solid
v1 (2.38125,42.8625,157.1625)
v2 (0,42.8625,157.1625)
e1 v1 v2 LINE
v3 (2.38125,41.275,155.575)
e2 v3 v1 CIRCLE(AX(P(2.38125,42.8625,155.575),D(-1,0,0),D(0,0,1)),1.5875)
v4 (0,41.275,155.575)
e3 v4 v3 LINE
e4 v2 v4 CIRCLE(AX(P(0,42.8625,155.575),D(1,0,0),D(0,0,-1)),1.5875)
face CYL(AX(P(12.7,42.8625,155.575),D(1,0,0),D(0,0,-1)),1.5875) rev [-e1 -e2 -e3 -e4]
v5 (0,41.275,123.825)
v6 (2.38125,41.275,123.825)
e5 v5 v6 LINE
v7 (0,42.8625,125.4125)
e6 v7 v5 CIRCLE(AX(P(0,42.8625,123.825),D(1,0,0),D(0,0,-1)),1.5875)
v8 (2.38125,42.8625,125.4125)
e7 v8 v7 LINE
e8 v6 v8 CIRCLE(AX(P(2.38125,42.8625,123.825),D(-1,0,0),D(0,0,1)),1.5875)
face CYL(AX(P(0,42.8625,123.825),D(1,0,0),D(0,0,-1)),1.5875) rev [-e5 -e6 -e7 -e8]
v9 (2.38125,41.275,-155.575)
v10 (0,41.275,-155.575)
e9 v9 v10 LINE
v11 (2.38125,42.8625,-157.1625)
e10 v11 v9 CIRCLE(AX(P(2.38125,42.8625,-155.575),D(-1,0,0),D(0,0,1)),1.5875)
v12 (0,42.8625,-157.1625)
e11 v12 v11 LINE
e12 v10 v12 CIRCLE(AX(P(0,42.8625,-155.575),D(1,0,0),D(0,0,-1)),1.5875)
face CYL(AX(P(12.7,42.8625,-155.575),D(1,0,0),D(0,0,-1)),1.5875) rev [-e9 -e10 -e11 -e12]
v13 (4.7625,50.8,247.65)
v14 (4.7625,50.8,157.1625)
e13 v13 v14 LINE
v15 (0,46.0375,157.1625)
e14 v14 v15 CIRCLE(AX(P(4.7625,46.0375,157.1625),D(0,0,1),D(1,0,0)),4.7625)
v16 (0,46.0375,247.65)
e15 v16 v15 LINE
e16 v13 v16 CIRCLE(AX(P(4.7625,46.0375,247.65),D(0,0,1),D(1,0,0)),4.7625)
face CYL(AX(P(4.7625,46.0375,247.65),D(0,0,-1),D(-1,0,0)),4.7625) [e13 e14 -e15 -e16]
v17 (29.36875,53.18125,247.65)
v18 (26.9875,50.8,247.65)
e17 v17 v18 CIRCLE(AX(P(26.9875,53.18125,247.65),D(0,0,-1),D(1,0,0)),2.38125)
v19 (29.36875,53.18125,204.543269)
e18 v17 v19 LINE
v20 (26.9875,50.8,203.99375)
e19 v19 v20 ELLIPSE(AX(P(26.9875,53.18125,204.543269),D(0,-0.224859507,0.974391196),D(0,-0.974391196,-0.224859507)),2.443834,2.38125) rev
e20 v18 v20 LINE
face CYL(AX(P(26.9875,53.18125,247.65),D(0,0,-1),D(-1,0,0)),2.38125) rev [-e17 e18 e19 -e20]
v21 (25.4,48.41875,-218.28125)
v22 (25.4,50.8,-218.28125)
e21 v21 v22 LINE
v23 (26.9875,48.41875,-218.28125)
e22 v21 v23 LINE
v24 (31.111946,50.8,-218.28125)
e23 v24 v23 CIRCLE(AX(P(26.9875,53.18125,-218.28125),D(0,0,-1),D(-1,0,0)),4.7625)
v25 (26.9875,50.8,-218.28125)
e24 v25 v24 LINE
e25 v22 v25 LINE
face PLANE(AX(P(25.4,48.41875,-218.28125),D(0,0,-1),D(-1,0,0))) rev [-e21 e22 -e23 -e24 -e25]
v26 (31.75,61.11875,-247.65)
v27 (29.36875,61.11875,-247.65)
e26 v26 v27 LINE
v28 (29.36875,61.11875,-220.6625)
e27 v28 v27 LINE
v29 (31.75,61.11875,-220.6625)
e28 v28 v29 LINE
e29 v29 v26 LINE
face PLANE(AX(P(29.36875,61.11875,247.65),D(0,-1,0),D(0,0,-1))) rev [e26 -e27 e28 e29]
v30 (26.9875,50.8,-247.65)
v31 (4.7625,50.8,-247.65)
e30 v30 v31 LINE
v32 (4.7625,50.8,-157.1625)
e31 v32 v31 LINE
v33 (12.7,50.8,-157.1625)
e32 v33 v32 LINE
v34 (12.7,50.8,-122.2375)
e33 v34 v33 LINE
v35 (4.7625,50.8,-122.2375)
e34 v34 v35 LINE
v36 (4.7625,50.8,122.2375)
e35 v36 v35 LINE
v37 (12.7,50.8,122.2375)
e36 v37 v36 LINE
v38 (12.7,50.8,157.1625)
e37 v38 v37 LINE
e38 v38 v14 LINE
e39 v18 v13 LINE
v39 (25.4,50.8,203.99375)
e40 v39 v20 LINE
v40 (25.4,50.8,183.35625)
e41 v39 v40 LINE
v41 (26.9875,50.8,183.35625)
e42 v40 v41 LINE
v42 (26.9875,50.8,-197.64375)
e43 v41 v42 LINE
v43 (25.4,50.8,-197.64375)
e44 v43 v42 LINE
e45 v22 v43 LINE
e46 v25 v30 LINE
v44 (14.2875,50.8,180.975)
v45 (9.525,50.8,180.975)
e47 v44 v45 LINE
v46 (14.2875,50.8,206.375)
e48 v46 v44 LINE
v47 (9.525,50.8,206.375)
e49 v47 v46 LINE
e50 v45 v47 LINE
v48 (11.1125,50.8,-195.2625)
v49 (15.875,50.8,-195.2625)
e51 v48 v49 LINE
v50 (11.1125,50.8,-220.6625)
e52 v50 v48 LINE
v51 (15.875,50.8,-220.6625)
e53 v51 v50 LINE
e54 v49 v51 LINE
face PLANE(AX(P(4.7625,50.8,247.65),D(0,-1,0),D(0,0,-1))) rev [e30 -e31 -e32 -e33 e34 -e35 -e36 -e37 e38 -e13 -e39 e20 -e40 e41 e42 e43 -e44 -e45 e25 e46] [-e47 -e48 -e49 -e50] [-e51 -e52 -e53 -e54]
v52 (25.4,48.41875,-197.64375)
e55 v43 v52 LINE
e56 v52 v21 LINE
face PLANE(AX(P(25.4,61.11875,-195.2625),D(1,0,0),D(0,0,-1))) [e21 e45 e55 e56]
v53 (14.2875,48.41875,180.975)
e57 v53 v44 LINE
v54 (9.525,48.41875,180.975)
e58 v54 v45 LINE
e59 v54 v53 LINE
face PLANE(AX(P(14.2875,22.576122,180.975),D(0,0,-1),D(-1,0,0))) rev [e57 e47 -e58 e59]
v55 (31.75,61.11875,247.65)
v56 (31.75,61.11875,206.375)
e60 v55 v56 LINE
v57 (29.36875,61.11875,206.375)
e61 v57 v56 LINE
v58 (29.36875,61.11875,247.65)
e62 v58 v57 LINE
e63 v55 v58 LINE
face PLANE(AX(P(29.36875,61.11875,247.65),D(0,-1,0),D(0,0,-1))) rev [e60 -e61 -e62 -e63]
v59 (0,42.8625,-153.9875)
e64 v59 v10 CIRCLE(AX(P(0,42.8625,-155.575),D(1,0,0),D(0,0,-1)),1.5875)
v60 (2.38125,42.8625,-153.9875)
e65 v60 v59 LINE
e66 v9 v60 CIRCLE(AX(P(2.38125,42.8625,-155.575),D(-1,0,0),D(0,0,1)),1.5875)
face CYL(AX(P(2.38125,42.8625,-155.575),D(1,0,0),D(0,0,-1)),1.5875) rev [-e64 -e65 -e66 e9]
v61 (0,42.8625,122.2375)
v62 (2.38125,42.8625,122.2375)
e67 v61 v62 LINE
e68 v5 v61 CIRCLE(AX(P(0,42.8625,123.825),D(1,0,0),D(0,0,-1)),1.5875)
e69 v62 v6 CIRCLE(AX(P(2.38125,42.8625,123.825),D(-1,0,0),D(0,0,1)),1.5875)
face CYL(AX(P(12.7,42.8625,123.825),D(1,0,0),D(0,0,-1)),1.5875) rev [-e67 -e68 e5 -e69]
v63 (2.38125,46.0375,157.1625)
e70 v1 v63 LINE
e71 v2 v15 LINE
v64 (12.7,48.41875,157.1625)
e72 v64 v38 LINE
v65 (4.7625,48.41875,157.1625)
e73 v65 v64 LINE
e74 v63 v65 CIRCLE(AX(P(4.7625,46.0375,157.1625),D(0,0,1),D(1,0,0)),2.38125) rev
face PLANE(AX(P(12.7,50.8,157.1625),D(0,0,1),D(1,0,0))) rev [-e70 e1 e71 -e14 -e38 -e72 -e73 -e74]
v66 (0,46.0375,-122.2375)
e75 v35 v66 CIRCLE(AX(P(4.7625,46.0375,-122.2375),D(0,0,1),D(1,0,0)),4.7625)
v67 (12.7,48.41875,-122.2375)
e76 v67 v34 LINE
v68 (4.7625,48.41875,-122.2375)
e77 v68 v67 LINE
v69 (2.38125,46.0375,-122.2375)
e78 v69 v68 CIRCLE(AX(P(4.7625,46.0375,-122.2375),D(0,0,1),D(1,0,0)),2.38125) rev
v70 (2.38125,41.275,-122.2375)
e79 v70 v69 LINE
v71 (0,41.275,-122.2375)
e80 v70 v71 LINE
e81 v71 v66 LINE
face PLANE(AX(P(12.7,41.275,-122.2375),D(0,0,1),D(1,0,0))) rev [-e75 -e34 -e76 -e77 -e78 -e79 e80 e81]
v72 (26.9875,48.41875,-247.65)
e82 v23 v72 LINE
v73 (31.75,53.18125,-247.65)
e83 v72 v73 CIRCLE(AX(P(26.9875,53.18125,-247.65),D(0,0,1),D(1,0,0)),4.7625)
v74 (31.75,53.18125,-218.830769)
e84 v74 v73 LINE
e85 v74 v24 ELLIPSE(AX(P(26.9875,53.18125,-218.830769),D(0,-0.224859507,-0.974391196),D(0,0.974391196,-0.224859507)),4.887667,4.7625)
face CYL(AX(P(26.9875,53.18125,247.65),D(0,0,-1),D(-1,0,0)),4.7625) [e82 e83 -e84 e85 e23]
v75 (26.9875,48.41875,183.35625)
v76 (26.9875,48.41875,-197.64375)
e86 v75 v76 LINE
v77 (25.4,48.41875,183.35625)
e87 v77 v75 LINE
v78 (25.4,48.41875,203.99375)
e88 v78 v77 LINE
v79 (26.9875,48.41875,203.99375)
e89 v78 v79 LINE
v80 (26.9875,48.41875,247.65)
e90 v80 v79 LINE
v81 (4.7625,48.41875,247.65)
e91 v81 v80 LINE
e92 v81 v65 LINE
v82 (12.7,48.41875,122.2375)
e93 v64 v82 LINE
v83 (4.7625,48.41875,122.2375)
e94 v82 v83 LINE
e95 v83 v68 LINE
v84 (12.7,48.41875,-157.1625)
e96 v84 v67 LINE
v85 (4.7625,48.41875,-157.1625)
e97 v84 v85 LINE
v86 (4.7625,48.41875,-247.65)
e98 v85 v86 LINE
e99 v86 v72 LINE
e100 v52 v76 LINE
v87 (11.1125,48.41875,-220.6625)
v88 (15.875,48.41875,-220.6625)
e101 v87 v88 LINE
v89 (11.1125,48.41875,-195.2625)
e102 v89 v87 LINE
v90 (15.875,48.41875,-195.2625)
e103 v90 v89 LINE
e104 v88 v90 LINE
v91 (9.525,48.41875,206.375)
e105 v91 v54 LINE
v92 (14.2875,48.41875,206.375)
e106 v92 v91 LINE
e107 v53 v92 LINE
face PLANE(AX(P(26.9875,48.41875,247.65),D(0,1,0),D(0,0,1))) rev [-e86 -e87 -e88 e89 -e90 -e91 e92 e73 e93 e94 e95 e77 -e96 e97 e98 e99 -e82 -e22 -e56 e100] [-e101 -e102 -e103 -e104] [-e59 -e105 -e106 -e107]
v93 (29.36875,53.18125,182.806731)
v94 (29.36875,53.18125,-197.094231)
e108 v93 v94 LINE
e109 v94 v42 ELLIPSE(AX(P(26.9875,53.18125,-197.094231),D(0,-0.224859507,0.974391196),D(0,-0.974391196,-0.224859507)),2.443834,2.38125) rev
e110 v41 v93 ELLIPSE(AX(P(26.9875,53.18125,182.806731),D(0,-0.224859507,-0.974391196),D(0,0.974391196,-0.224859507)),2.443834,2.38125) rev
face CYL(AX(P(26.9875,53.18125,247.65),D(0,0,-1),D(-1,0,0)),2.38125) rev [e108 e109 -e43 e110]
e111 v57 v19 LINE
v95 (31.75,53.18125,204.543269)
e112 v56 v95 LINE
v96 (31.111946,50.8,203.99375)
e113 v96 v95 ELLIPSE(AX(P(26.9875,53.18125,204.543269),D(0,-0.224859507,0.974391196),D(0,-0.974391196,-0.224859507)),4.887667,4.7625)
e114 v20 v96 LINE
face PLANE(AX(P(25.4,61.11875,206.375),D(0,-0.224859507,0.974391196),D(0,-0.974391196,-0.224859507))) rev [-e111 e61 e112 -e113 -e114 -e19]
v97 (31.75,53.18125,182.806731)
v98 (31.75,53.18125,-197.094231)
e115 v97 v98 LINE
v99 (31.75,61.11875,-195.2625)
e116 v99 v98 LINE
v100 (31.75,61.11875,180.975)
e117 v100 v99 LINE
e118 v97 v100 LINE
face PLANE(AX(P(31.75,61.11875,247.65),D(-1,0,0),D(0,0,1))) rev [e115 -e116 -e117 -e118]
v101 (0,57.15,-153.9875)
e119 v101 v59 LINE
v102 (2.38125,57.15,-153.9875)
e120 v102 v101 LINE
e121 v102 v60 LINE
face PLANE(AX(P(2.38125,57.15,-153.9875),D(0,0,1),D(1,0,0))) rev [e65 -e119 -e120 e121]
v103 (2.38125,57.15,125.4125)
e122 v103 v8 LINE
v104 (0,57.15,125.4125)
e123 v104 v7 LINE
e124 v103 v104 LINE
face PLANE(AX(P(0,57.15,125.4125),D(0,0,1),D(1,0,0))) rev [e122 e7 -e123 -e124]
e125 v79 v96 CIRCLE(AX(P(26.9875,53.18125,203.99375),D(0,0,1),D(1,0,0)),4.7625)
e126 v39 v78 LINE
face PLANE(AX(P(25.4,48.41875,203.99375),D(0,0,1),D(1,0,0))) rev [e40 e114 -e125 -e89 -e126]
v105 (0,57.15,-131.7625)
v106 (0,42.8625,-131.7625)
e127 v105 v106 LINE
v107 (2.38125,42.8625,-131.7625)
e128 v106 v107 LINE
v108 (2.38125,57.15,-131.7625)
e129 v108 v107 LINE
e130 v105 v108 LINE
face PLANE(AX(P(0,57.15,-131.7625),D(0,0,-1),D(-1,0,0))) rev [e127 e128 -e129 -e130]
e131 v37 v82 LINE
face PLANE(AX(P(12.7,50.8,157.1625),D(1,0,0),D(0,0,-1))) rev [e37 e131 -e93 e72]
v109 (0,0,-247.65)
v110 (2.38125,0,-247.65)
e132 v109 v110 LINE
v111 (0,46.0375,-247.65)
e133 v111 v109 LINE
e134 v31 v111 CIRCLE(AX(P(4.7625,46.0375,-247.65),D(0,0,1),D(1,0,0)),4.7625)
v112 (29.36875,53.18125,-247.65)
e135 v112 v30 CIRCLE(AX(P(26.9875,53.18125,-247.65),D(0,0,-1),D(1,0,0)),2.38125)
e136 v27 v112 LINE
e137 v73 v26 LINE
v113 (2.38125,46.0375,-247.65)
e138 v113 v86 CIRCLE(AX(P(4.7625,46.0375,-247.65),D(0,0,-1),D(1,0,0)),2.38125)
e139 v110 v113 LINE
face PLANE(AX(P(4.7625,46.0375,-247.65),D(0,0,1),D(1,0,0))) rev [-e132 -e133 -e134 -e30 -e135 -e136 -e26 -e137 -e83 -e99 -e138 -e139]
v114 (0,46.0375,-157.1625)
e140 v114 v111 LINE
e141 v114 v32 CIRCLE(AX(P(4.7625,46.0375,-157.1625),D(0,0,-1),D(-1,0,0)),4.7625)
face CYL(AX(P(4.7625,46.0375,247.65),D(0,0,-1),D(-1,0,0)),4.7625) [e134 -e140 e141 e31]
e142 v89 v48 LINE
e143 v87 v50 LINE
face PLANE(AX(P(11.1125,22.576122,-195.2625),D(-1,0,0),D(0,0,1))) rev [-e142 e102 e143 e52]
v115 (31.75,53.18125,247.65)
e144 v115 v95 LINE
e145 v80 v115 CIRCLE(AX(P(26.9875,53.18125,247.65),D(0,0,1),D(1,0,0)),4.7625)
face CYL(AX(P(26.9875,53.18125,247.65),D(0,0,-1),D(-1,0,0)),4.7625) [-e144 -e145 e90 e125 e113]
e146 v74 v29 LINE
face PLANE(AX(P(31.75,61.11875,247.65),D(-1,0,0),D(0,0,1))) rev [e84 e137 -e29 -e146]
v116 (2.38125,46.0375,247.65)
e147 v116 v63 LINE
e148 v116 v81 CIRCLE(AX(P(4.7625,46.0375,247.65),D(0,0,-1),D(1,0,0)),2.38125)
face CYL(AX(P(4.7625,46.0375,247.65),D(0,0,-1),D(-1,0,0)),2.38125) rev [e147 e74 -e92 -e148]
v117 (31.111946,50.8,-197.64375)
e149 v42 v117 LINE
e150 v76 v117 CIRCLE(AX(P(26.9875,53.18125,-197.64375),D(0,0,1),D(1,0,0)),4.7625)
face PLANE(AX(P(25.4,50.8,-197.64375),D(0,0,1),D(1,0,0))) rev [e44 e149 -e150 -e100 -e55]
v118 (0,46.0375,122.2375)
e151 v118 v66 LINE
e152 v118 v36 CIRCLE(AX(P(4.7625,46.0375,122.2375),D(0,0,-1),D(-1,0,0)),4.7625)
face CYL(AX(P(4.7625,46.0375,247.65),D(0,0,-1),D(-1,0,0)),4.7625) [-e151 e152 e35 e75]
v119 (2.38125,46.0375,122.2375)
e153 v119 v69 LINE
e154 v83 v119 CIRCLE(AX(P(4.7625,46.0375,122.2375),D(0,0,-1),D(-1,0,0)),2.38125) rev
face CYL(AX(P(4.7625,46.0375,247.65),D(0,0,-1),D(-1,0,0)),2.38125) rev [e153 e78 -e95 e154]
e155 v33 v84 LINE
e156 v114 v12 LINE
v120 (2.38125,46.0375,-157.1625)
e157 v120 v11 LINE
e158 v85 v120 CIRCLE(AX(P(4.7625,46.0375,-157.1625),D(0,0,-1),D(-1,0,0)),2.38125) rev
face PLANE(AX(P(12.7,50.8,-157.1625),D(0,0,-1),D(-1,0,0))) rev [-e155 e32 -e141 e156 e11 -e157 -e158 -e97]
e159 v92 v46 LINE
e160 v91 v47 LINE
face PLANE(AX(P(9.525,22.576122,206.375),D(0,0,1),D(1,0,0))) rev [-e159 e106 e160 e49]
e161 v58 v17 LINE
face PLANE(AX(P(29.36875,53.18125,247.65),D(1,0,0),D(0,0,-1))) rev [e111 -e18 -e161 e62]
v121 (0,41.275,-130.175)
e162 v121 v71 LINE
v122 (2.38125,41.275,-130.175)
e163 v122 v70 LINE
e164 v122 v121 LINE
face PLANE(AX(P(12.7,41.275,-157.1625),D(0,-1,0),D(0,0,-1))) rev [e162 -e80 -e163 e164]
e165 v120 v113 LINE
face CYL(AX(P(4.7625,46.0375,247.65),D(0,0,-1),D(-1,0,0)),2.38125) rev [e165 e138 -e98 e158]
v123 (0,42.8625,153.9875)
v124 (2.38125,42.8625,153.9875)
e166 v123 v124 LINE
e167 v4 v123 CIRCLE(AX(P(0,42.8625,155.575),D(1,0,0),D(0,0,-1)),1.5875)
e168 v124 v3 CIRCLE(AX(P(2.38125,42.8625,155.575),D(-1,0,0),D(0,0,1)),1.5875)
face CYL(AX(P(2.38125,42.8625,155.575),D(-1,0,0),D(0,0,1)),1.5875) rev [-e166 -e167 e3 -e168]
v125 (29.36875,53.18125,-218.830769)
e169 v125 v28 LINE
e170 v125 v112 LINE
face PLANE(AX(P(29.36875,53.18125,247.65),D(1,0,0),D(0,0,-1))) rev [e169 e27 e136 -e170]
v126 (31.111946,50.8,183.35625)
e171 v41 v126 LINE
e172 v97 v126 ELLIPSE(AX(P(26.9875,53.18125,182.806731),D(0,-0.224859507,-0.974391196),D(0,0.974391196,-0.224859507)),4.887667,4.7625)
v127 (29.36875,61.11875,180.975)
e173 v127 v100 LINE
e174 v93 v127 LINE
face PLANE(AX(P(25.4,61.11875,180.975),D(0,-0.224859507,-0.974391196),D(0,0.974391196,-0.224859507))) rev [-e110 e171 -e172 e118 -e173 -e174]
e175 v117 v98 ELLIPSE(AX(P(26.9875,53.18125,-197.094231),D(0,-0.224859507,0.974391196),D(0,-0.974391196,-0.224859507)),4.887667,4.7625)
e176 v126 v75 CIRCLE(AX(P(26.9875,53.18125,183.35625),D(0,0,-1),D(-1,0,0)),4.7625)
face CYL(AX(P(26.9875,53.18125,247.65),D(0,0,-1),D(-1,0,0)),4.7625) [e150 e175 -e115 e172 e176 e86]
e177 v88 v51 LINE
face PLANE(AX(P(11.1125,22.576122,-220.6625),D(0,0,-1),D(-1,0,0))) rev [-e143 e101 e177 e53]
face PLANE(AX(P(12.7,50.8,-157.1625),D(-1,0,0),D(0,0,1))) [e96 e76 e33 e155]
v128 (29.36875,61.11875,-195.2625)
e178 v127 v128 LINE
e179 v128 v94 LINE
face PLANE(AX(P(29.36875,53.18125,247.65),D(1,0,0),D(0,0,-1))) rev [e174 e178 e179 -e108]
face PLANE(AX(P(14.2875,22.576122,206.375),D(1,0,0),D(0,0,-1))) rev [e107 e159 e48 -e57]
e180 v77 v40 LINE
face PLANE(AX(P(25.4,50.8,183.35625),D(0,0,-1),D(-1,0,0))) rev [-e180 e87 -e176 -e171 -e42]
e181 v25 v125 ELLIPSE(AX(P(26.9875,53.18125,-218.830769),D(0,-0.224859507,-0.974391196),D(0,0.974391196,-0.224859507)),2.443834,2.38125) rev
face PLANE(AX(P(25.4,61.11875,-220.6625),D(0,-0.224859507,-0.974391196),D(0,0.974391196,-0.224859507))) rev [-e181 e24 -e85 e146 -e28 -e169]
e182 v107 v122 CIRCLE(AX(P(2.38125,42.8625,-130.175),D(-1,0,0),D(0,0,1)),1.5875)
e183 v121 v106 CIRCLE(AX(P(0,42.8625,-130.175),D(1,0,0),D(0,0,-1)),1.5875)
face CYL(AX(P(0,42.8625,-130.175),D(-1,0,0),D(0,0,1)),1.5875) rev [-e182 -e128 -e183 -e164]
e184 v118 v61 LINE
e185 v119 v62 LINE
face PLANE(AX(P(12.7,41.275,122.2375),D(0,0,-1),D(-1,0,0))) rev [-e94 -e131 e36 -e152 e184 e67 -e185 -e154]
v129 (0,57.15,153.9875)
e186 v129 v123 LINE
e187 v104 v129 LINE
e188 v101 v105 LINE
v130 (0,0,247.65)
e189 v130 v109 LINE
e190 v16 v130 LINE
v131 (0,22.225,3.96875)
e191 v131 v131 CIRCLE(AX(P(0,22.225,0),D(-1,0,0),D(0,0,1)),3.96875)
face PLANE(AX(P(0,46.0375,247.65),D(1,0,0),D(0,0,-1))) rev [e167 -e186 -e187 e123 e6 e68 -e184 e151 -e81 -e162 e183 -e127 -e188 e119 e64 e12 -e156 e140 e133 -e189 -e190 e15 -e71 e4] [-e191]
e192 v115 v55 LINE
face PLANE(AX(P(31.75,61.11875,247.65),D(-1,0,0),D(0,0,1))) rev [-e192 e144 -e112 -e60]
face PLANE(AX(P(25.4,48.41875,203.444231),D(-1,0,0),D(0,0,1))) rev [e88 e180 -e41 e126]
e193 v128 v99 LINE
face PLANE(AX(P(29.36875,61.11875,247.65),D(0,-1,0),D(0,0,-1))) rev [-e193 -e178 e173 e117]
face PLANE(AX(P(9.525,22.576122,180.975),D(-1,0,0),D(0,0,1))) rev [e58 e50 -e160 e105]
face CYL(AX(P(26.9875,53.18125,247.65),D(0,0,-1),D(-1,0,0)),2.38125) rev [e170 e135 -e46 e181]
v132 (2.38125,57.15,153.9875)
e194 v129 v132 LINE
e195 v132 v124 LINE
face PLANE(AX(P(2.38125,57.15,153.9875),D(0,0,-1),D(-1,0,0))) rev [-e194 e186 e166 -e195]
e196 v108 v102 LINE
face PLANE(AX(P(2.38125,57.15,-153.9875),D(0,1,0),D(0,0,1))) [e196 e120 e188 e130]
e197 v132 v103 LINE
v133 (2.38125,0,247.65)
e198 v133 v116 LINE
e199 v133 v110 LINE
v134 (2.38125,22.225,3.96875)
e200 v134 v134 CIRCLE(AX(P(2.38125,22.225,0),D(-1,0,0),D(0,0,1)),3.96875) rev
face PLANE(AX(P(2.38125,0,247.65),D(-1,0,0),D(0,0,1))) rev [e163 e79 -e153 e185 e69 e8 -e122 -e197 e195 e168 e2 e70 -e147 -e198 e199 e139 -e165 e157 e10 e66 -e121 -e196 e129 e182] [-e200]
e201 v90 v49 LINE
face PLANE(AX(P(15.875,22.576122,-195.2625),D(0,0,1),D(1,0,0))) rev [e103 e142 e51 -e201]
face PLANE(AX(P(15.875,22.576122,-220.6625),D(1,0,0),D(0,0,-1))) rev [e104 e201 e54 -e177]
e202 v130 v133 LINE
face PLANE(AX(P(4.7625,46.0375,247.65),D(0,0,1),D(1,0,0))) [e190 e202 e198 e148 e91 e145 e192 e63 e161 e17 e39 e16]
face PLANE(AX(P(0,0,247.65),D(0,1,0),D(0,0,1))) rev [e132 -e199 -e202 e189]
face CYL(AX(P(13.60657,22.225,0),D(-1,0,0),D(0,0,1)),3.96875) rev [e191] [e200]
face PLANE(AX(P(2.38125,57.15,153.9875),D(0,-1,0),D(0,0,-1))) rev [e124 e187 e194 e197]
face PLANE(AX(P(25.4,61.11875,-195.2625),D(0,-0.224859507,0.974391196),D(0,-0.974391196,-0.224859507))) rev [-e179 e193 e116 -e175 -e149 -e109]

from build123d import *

# Parameters (mm, degrees)
EXTRUDE1_DEPTH     = 247.65
SKETCH2_W          = 34.925
SKETCH2_H          = 9.525
CUT_EXTRUDE1_DEPTH = 12.7
SKETCH3_W          = 2.38125
SKETCH3_H          = 22.225
SKETCH3_H_2        = 28.575
EXTRUDE2_DEPTH     = 15.875
FILLET1_R          = 1.5875
SKETCH4_W          = 4.7625
SKETCH4_H          = 25.4
CUT_EXTRUDE2_DEPTH = 2.38125
CUT_EXTRUDE3_DEPTH = 6.35
SKETCH6_R          = 3.96875
CUT_EXTRUDE4_DEPTH = 2.38125


with BuildPart() as part:
    # Sketch1 → Extrude1 (new, symmetric)
    with BuildSketch(Plane.XY):
        with BuildLine():
            Line((0, 46.0375), (0, 0))
            Line((0, 0), (2.38125, 0))
            Line((2.38125, 0), (2.38125, 46.0375))
            ThreePointArc((2.38125, 46.0375), (3.078701977, 47.721298023), (4.7625, 48.41875))
            Line((4.7625, 48.41875), (26.9875, 48.41875))
            ThreePointArc((26.9875, 48.41875), (30.355096045, 49.813653955), (31.75, 53.18125))
            Line((31.75, 53.18125), (31.75, 61.11875))
            Line((31.75, 61.11875), (29.36875, 61.11875))
            Line((29.36875, 61.11875), (29.36875, 53.18125))
            ThreePointArc((29.36875, 53.18125), (28.671298023, 51.497451977), (26.9875, 50.8))
            Line((26.9875, 50.8), (4.7625, 50.8))
            ThreePointArc((4.7625, 50.8), (1.394903955, 49.405096045), (0, 46.0375))
        make_face()
    extrude(amount=EXTRUDE1_DEPTH, both=True)

    # Sketch2 → Cut-Extrude1 (cut)
    with BuildSketch(Plane.ZY):
        with Locations((-139.7, 46.0375)):
            Rectangle(SKETCH2_W, SKETCH2_H)
        with Locations((139.7, 46.0375)):
            Rectangle(SKETCH2_W, SKETCH2_H)
    extrude(amount=-CUT_EXTRUDE1_DEPTH, mode=Mode.SUBTRACT)

    # Sketch3 → Extrude2 (add)
    with BuildSketch(Plane(origin=(0, 41.275, 0), x_dir=(1, 0, 0), z_dir=(0, 1, 0))):
        with Locations((1.190625, 142.875)):
            Rectangle(SKETCH3_W, SKETCH3_H)
        with Locations((1.190625, -139.7)):
            Rectangle(SKETCH3_W, SKETCH3_H_2)
    extrude(amount=EXTRUDE2_DEPTH)

    # Fillet1
    fillet1_edges = [part.edges().sort_by_distance(p)[0] for p in [
        (1.190625, 41.275, 125.4125),
        (1.190625, 41.275, 153.9875),
        (1.190625, 41.275, -157.1625),
        (1.190625, 41.275, 157.1625),
        (1.190625, 41.275, 122.2375),
        (1.190625, 41.275, -153.9875),
        (1.190625, 41.275, -131.7625),
    ]]
    fillet(fillet1_edges, radius=FILLET1_R - 0.0001)  # a hair under: the kernel refuses the full size

    # Sketch4 → Cut-Extrude2 (cut)
    with BuildSketch(Plane(origin=(0, 50.8, 0), x_dir=(1, 0, 0), z_dir=(0, 1, 0))):
        with Locations((13.49375, 207.9625)):
            Rectangle(SKETCH4_W, SKETCH4_H)
        with Locations((11.90625, -193.675)):
            Rectangle(SKETCH4_W, SKETCH4_H)
    extrude(amount=-CUT_EXTRUDE2_DEPTH, mode=Mode.SUBTRACT)

    # Sketch5 → Cut-Extrude3 (cut)
    with BuildSketch(Plane(origin=(31.75, 0, 0), x_dir=(0, 0, -1), z_dir=(1, 0, 0))):
        Polygon((195.2625, 61.11875), (220.6625, 61.11875), (218.28125, 50.8), (218.28125, 48.41875), (197.64375, 48.41875), (197.64375, 50.8), align=None)
        Polygon((-180.975, 61.11875), (-206.375, 61.11875), (-203.99375, 50.8), (-203.99375, 48.41875), (-183.35625, 48.41875), (-183.35625, 50.8), align=None)
    extrude(amount=-CUT_EXTRUDE3_DEPTH, mode=Mode.SUBTRACT)

    # Sketch6 → Cut-Extrude4 (cut)
    with BuildSketch(Plane.ZY):
        with Locations((0, 22.225)):
            Circle(SKETCH6_R)
    extrude(amount=-CUT_EXTRUDE4_DEPTH, mode=Mode.SUBTRACT)


solid = part.part
